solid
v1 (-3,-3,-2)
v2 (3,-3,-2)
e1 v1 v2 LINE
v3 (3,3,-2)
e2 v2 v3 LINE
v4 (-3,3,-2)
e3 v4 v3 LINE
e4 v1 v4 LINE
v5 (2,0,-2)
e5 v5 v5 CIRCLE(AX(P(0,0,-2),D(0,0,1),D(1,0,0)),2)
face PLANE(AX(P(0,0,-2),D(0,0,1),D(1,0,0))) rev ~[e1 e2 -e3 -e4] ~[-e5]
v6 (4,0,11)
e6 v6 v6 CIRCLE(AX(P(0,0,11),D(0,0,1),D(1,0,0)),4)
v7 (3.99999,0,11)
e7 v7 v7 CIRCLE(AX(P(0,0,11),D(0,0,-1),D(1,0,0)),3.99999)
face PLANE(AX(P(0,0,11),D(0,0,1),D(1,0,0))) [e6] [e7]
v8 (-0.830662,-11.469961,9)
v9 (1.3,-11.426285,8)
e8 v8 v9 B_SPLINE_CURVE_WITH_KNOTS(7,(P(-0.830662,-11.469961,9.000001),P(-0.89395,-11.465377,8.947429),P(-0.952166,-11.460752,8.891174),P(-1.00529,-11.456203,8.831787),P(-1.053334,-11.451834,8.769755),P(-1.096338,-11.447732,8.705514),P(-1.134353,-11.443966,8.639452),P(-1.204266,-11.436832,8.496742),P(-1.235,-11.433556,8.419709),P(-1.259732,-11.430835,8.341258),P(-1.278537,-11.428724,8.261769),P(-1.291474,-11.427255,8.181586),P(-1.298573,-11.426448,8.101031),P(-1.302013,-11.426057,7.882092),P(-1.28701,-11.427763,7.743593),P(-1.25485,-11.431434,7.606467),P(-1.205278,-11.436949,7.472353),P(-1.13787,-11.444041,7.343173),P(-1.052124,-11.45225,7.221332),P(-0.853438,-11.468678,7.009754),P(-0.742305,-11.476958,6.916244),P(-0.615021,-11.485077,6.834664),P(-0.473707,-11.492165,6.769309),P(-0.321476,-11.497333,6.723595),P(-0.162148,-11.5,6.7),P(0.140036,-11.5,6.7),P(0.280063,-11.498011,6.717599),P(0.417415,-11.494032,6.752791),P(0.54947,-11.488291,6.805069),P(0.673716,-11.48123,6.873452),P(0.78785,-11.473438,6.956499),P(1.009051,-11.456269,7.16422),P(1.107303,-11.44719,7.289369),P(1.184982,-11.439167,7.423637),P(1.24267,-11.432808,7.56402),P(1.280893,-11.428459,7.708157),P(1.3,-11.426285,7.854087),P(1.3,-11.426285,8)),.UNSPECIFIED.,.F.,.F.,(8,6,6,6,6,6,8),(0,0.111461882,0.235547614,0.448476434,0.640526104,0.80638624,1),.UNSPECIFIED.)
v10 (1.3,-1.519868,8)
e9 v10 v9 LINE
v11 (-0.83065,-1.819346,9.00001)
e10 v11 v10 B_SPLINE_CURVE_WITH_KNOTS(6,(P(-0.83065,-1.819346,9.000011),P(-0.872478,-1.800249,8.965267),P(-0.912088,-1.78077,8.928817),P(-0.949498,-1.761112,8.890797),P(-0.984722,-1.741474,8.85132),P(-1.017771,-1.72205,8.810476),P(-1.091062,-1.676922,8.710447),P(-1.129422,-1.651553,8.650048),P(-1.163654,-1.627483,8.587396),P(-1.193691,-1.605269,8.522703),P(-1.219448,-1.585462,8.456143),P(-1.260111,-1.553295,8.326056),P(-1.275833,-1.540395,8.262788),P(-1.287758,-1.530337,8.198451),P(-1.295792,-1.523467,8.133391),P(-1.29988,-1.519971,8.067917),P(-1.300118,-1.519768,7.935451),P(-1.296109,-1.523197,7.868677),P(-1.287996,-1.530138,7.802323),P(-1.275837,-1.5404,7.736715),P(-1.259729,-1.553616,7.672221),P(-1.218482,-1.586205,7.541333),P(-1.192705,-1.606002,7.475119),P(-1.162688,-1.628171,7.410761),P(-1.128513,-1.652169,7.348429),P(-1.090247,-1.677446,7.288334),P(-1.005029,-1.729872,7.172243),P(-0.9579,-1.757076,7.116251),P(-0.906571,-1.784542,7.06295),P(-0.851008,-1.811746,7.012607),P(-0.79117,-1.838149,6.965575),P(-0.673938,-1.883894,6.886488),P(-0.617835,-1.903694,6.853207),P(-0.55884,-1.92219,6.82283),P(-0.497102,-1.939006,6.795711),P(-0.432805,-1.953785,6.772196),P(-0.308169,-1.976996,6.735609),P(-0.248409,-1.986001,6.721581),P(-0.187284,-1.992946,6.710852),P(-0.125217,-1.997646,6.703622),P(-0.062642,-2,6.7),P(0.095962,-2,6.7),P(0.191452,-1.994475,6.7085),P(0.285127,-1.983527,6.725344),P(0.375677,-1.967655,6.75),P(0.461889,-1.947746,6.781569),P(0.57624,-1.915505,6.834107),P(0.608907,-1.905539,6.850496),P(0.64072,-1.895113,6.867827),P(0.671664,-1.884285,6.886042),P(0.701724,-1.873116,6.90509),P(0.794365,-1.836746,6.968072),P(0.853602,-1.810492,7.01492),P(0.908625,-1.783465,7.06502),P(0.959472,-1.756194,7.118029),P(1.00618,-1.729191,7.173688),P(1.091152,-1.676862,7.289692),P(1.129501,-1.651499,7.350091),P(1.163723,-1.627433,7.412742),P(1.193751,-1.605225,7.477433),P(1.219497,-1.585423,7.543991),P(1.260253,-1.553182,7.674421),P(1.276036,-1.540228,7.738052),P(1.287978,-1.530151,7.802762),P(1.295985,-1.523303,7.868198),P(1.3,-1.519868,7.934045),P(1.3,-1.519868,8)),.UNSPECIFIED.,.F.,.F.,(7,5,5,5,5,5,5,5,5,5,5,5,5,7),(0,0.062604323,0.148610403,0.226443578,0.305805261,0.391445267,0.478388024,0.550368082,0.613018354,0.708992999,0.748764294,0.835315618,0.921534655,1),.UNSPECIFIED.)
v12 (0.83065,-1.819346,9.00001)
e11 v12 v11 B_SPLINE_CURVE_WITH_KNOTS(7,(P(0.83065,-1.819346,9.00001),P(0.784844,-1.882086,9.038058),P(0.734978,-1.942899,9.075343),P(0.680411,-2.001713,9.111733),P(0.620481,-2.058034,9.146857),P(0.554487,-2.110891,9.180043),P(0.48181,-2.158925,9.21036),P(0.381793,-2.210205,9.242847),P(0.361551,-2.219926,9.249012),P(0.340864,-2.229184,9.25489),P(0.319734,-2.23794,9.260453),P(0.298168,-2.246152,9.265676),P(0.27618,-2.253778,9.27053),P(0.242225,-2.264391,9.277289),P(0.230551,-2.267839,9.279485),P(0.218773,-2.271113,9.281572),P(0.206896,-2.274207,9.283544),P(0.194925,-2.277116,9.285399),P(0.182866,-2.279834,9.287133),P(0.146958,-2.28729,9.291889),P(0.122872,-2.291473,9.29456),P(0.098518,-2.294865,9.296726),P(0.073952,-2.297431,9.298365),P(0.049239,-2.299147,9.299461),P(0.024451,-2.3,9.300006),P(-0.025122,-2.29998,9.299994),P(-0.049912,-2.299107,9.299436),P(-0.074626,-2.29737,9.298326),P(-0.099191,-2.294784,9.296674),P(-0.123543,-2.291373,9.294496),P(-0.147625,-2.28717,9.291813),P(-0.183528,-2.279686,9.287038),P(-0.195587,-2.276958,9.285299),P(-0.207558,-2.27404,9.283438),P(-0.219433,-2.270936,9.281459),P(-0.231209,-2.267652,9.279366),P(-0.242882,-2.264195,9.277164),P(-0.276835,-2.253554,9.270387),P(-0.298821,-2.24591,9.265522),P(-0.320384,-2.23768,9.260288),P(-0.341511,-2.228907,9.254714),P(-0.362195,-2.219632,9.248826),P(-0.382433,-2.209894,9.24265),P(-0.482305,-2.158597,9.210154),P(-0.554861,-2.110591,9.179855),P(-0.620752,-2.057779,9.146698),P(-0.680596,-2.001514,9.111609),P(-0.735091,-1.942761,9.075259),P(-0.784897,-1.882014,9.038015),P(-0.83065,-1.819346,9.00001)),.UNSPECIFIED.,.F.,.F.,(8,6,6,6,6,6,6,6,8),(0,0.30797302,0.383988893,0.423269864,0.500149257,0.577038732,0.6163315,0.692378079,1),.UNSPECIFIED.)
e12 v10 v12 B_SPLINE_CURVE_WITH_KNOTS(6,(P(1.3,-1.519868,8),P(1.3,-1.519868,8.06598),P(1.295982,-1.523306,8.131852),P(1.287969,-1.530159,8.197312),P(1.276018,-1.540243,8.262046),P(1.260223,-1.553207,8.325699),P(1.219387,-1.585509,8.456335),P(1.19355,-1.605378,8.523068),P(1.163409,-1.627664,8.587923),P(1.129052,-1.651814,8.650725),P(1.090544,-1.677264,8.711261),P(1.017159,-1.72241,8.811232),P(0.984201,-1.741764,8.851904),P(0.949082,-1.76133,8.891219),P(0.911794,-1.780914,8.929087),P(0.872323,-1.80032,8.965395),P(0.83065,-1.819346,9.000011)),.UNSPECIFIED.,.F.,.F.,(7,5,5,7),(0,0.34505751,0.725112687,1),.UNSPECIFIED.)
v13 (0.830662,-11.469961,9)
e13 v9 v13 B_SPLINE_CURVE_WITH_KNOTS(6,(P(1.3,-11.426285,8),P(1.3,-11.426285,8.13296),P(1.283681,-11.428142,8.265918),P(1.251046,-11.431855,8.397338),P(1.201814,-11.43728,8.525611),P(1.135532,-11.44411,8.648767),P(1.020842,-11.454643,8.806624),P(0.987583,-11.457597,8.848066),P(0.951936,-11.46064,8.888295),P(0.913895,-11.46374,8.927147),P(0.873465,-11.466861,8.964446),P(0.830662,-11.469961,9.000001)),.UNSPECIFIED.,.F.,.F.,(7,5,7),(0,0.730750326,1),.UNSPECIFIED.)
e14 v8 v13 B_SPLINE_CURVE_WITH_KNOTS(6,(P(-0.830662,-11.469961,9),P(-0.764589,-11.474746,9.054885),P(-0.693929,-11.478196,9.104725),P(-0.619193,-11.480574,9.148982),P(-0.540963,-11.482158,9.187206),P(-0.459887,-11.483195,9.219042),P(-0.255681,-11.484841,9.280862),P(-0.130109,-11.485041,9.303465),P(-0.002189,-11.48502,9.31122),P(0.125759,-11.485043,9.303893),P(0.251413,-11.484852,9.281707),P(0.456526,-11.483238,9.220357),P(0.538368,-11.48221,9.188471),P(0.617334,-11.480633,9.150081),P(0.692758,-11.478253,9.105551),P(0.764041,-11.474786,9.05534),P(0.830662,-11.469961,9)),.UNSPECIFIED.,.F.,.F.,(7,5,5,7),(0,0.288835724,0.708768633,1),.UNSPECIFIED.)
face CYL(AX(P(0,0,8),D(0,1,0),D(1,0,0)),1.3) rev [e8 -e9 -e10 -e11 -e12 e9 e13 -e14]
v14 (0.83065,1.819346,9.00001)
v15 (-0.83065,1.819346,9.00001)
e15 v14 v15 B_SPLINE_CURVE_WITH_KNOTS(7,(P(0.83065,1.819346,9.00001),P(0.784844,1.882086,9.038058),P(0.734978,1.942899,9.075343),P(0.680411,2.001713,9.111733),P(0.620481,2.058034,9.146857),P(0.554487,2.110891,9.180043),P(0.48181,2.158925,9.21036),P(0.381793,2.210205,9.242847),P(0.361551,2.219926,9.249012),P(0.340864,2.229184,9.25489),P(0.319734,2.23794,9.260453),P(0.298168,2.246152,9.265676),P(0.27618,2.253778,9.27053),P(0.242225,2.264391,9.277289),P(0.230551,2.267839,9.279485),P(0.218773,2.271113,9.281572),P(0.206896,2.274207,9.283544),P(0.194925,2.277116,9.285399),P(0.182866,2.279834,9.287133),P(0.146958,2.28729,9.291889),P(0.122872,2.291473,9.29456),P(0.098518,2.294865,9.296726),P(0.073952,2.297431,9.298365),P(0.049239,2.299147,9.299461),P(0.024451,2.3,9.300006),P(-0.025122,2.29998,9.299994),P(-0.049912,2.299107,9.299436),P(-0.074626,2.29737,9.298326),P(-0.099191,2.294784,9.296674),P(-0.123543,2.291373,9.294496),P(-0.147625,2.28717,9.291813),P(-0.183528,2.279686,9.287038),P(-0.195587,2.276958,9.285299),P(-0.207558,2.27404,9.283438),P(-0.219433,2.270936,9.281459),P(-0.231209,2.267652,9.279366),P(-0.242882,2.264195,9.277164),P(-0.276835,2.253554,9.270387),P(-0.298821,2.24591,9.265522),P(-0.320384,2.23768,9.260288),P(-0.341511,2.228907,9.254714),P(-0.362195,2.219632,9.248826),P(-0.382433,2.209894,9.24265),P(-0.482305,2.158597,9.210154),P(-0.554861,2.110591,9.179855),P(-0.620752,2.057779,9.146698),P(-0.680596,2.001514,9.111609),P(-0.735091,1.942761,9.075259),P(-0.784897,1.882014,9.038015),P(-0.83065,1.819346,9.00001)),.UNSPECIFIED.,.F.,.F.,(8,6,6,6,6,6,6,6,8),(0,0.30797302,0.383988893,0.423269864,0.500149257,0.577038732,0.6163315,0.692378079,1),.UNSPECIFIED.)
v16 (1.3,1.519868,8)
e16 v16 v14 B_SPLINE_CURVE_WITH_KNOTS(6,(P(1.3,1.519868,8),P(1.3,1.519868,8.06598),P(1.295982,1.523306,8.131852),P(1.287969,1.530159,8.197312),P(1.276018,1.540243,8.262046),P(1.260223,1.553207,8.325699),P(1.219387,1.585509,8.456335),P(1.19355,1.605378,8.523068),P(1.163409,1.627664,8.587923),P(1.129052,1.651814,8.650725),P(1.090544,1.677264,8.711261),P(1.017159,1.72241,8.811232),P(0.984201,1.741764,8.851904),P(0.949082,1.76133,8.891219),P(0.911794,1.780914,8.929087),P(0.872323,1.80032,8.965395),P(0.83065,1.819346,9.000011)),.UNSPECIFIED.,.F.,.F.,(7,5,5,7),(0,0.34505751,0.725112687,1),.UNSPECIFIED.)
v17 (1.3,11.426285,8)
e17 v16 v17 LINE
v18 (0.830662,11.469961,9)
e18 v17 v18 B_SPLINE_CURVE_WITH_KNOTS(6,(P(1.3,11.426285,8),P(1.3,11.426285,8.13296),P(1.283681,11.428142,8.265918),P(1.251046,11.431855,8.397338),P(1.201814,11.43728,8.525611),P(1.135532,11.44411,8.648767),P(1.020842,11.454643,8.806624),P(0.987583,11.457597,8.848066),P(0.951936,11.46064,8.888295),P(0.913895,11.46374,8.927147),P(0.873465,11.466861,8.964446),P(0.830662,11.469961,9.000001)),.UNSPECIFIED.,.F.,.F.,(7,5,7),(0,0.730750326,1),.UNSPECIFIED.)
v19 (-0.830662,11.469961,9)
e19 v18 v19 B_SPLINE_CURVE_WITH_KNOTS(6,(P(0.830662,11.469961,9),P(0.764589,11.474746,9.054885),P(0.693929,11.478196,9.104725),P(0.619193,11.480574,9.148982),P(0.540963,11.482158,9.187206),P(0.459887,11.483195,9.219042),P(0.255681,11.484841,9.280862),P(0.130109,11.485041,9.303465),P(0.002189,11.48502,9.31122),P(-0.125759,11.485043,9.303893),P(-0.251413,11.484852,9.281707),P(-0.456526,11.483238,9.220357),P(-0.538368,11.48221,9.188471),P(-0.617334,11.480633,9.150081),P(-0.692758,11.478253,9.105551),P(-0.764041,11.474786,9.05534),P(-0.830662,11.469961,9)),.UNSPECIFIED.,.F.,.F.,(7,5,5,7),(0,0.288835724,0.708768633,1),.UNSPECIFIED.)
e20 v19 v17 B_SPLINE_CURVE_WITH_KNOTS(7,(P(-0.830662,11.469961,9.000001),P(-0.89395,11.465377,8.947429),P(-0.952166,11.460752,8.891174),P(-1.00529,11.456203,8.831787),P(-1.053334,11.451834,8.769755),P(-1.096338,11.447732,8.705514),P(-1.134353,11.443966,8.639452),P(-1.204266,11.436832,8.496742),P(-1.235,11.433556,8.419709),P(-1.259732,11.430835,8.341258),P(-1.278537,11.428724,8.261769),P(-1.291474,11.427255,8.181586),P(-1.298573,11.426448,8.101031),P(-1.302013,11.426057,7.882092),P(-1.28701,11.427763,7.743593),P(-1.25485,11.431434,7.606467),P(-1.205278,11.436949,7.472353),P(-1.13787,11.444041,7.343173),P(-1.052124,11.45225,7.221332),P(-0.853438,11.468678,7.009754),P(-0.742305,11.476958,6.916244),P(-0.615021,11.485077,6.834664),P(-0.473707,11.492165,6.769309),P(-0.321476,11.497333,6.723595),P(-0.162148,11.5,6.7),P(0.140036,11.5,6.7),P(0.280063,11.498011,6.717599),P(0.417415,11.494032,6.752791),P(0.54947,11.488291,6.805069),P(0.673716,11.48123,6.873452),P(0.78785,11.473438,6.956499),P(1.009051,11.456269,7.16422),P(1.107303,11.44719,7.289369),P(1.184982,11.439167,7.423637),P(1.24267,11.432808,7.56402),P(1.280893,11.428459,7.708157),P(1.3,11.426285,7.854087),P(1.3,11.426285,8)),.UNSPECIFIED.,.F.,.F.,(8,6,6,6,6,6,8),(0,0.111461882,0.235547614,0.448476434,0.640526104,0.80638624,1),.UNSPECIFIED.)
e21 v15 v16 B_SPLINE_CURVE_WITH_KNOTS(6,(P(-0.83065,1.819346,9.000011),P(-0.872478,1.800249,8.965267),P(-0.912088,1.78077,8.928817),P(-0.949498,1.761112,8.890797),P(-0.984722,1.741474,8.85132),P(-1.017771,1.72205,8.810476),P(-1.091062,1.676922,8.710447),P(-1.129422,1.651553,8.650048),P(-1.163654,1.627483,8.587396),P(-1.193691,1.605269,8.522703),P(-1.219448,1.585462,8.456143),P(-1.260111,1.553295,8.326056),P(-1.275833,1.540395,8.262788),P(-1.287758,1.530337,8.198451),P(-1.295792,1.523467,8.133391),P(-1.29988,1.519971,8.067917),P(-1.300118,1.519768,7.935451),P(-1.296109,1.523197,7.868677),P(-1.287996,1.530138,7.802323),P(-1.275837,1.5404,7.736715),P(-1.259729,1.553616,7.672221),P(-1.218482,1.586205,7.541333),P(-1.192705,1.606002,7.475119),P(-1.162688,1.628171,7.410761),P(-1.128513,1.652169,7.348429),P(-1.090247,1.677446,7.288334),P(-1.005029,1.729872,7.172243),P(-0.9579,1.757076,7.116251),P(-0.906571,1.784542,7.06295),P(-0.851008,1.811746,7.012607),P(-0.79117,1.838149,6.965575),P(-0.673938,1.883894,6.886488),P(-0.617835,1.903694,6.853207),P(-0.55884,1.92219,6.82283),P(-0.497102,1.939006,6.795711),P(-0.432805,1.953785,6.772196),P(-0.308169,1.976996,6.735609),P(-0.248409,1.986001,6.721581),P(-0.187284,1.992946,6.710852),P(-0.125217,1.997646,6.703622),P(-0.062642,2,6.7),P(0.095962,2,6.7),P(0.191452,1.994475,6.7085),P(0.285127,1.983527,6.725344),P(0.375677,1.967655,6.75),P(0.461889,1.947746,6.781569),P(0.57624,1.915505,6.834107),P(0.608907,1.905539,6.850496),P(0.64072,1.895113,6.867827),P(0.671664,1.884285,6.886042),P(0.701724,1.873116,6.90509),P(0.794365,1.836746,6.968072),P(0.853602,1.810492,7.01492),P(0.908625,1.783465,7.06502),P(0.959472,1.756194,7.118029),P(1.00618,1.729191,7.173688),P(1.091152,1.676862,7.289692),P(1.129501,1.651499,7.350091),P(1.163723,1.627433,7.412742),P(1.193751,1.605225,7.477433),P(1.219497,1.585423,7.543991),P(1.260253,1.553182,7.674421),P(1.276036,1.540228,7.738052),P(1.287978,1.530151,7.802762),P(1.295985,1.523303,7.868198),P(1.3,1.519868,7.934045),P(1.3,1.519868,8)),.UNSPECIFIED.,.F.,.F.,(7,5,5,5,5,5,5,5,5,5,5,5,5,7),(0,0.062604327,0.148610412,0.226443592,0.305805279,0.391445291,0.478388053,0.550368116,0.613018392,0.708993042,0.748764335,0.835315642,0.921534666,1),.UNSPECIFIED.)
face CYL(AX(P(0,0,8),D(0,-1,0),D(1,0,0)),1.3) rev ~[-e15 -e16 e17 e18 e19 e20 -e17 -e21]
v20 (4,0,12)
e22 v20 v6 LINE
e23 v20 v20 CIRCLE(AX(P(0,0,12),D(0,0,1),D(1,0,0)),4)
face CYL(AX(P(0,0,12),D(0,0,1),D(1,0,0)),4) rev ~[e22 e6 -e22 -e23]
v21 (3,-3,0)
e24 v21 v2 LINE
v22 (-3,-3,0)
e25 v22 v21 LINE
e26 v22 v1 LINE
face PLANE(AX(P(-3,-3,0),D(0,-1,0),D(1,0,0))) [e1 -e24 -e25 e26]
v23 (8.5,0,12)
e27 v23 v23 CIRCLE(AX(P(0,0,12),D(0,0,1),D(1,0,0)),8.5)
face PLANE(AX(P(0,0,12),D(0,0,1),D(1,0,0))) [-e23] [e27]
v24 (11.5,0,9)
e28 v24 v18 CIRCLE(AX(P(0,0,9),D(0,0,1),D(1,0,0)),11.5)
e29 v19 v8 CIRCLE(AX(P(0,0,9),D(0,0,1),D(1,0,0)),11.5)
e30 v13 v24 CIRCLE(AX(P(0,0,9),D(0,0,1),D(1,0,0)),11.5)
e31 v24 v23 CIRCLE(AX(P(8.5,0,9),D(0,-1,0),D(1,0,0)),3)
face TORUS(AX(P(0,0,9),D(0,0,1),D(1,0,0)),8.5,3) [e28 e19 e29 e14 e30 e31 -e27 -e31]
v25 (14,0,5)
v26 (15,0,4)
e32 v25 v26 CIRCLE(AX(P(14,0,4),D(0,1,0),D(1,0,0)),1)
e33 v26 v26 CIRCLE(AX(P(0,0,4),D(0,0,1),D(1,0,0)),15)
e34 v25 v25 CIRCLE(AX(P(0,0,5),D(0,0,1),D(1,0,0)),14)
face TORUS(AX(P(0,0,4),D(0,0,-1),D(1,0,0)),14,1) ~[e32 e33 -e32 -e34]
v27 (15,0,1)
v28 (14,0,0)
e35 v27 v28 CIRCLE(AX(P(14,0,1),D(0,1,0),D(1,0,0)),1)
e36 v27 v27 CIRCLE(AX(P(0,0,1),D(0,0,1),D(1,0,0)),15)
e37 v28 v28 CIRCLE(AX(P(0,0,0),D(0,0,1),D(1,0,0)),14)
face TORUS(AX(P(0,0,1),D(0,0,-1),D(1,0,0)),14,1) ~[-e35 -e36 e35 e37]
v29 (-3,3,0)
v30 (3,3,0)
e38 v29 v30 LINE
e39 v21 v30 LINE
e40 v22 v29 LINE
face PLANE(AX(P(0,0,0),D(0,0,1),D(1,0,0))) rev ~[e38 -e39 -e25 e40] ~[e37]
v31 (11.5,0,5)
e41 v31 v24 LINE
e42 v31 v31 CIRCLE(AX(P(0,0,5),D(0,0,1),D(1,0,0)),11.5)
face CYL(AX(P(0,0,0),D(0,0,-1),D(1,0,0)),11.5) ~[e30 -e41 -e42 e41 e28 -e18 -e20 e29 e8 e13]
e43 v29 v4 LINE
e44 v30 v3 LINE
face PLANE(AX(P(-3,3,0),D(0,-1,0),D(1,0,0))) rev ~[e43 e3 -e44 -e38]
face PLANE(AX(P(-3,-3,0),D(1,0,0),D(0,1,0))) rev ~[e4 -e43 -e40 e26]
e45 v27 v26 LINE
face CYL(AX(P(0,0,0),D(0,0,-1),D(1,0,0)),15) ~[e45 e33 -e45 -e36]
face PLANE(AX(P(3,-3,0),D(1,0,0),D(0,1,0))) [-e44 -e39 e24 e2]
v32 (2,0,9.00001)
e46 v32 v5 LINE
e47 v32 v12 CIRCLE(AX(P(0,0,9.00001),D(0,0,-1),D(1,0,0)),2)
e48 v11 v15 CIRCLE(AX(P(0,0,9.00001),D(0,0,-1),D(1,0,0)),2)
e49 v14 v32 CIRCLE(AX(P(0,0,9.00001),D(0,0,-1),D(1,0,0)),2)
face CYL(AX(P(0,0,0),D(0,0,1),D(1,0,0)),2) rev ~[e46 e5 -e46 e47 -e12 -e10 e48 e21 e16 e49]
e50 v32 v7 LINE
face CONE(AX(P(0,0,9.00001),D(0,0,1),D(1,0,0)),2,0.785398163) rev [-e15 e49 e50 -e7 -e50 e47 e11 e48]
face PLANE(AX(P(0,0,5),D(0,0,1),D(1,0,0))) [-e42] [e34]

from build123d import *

# Parameters (mm, degrees)
F0_R           = 15
F0_R_2         = 11.5
F1_DEPTH       = 5
F0_R_3         = 2
F2_DEPTH       = 12
F3_R           = 3
F4_R           = 1
F5_R           = 4
F6_DEPTH       = 1
F7_SIZE        = 1.99999
F8_R           = 1.3
F9_DEPTH       = 25
F9_DEPTH_BACK  = 25
F10_W          = 6
F10_H          = 6
F11_DEPTH      = 5
F11_DEPTH_BACK = 2
F12_R          = 2
F13_DEPTH      = 25
F13_DEPTH_BACK = 25


# Not quite as in the source:
# - a fillet or chamfer is up to 0.001 mm smaller than in the source, because OpenCascade refuses the exact size


with BuildPart() as f1:
    # F0 (on Top) → F1 (new body)
    with BuildSketch(Plane.XY):
        Circle(F0_R)
        Circle(F0_R_2, mode=Mode.SUBTRACT)
    extrude(amount=F1_DEPTH)

    # F0 (on Top) → F2 (join)
    with BuildSketch(Plane.XY):
        Circle(F0_R_2)
        Circle(F0_R_3, mode=Mode.SUBTRACT)
    extrude(amount=F2_DEPTH)

    # F3
    f3_edges = [f1.edges().sort_by_distance(p)[0] for p in [
        (-11.5, 0, 12),
    ]]
    fillet(f3_edges, radius=F3_R)

    # F4
    f4_edges = [f1.edges().sort_by_distance(p)[0] for p in [
        (-15, 0, 0),
        (-15, 0, 5),
    ]]
    fillet(f4_edges, radius=F4_R)

    # F5 (on face) → F6 (cut)
    with BuildSketch(Plane.XY.offset(12)):
        Circle(F5_R)
    extrude(amount=-F6_DEPTH, mode=Mode.SUBTRACT)

    # F7 (size 2 in the source; OpenCascade refuses exactly that, so slightly less here)
    f7_edges = [f1.edges().sort_by_distance(p)[0] for p in [
        (-2, 0, 11),
    ]]
    chamfer(f7_edges, length=F7_SIZE)

    # F8 (on Front) → F9 (cut, two sides)
    with BuildSketch(Plane.XZ) as f9_sk:
        with Locations((0, 8)):
            Circle(F8_R)
    extrude(amount=F9_DEPTH, mode=Mode.SUBTRACT)
    extrude(f9_sk.sketch, amount=-F9_DEPTH_BACK, mode=Mode.SUBTRACT)

    # F10 (on Top) → F11 (join, two sides)
    with BuildSketch(Plane.XY) as f11_sk:
        Rectangle(F10_W, F10_H)
    extrude(amount=F11_DEPTH)
    extrude(f11_sk.sketch, amount=-F11_DEPTH_BACK)

    # F12 (on Top) → F13 (cut, two sides)
    with BuildSketch(Plane.XY) as f13_sk:
        Circle(F12_R)
    extrude(amount=-F13_DEPTH, mode=Mode.SUBTRACT)
    extrude(f13_sk.sketch, amount=F13_DEPTH_BACK, mode=Mode.SUBTRACT)


solid = f1.part
